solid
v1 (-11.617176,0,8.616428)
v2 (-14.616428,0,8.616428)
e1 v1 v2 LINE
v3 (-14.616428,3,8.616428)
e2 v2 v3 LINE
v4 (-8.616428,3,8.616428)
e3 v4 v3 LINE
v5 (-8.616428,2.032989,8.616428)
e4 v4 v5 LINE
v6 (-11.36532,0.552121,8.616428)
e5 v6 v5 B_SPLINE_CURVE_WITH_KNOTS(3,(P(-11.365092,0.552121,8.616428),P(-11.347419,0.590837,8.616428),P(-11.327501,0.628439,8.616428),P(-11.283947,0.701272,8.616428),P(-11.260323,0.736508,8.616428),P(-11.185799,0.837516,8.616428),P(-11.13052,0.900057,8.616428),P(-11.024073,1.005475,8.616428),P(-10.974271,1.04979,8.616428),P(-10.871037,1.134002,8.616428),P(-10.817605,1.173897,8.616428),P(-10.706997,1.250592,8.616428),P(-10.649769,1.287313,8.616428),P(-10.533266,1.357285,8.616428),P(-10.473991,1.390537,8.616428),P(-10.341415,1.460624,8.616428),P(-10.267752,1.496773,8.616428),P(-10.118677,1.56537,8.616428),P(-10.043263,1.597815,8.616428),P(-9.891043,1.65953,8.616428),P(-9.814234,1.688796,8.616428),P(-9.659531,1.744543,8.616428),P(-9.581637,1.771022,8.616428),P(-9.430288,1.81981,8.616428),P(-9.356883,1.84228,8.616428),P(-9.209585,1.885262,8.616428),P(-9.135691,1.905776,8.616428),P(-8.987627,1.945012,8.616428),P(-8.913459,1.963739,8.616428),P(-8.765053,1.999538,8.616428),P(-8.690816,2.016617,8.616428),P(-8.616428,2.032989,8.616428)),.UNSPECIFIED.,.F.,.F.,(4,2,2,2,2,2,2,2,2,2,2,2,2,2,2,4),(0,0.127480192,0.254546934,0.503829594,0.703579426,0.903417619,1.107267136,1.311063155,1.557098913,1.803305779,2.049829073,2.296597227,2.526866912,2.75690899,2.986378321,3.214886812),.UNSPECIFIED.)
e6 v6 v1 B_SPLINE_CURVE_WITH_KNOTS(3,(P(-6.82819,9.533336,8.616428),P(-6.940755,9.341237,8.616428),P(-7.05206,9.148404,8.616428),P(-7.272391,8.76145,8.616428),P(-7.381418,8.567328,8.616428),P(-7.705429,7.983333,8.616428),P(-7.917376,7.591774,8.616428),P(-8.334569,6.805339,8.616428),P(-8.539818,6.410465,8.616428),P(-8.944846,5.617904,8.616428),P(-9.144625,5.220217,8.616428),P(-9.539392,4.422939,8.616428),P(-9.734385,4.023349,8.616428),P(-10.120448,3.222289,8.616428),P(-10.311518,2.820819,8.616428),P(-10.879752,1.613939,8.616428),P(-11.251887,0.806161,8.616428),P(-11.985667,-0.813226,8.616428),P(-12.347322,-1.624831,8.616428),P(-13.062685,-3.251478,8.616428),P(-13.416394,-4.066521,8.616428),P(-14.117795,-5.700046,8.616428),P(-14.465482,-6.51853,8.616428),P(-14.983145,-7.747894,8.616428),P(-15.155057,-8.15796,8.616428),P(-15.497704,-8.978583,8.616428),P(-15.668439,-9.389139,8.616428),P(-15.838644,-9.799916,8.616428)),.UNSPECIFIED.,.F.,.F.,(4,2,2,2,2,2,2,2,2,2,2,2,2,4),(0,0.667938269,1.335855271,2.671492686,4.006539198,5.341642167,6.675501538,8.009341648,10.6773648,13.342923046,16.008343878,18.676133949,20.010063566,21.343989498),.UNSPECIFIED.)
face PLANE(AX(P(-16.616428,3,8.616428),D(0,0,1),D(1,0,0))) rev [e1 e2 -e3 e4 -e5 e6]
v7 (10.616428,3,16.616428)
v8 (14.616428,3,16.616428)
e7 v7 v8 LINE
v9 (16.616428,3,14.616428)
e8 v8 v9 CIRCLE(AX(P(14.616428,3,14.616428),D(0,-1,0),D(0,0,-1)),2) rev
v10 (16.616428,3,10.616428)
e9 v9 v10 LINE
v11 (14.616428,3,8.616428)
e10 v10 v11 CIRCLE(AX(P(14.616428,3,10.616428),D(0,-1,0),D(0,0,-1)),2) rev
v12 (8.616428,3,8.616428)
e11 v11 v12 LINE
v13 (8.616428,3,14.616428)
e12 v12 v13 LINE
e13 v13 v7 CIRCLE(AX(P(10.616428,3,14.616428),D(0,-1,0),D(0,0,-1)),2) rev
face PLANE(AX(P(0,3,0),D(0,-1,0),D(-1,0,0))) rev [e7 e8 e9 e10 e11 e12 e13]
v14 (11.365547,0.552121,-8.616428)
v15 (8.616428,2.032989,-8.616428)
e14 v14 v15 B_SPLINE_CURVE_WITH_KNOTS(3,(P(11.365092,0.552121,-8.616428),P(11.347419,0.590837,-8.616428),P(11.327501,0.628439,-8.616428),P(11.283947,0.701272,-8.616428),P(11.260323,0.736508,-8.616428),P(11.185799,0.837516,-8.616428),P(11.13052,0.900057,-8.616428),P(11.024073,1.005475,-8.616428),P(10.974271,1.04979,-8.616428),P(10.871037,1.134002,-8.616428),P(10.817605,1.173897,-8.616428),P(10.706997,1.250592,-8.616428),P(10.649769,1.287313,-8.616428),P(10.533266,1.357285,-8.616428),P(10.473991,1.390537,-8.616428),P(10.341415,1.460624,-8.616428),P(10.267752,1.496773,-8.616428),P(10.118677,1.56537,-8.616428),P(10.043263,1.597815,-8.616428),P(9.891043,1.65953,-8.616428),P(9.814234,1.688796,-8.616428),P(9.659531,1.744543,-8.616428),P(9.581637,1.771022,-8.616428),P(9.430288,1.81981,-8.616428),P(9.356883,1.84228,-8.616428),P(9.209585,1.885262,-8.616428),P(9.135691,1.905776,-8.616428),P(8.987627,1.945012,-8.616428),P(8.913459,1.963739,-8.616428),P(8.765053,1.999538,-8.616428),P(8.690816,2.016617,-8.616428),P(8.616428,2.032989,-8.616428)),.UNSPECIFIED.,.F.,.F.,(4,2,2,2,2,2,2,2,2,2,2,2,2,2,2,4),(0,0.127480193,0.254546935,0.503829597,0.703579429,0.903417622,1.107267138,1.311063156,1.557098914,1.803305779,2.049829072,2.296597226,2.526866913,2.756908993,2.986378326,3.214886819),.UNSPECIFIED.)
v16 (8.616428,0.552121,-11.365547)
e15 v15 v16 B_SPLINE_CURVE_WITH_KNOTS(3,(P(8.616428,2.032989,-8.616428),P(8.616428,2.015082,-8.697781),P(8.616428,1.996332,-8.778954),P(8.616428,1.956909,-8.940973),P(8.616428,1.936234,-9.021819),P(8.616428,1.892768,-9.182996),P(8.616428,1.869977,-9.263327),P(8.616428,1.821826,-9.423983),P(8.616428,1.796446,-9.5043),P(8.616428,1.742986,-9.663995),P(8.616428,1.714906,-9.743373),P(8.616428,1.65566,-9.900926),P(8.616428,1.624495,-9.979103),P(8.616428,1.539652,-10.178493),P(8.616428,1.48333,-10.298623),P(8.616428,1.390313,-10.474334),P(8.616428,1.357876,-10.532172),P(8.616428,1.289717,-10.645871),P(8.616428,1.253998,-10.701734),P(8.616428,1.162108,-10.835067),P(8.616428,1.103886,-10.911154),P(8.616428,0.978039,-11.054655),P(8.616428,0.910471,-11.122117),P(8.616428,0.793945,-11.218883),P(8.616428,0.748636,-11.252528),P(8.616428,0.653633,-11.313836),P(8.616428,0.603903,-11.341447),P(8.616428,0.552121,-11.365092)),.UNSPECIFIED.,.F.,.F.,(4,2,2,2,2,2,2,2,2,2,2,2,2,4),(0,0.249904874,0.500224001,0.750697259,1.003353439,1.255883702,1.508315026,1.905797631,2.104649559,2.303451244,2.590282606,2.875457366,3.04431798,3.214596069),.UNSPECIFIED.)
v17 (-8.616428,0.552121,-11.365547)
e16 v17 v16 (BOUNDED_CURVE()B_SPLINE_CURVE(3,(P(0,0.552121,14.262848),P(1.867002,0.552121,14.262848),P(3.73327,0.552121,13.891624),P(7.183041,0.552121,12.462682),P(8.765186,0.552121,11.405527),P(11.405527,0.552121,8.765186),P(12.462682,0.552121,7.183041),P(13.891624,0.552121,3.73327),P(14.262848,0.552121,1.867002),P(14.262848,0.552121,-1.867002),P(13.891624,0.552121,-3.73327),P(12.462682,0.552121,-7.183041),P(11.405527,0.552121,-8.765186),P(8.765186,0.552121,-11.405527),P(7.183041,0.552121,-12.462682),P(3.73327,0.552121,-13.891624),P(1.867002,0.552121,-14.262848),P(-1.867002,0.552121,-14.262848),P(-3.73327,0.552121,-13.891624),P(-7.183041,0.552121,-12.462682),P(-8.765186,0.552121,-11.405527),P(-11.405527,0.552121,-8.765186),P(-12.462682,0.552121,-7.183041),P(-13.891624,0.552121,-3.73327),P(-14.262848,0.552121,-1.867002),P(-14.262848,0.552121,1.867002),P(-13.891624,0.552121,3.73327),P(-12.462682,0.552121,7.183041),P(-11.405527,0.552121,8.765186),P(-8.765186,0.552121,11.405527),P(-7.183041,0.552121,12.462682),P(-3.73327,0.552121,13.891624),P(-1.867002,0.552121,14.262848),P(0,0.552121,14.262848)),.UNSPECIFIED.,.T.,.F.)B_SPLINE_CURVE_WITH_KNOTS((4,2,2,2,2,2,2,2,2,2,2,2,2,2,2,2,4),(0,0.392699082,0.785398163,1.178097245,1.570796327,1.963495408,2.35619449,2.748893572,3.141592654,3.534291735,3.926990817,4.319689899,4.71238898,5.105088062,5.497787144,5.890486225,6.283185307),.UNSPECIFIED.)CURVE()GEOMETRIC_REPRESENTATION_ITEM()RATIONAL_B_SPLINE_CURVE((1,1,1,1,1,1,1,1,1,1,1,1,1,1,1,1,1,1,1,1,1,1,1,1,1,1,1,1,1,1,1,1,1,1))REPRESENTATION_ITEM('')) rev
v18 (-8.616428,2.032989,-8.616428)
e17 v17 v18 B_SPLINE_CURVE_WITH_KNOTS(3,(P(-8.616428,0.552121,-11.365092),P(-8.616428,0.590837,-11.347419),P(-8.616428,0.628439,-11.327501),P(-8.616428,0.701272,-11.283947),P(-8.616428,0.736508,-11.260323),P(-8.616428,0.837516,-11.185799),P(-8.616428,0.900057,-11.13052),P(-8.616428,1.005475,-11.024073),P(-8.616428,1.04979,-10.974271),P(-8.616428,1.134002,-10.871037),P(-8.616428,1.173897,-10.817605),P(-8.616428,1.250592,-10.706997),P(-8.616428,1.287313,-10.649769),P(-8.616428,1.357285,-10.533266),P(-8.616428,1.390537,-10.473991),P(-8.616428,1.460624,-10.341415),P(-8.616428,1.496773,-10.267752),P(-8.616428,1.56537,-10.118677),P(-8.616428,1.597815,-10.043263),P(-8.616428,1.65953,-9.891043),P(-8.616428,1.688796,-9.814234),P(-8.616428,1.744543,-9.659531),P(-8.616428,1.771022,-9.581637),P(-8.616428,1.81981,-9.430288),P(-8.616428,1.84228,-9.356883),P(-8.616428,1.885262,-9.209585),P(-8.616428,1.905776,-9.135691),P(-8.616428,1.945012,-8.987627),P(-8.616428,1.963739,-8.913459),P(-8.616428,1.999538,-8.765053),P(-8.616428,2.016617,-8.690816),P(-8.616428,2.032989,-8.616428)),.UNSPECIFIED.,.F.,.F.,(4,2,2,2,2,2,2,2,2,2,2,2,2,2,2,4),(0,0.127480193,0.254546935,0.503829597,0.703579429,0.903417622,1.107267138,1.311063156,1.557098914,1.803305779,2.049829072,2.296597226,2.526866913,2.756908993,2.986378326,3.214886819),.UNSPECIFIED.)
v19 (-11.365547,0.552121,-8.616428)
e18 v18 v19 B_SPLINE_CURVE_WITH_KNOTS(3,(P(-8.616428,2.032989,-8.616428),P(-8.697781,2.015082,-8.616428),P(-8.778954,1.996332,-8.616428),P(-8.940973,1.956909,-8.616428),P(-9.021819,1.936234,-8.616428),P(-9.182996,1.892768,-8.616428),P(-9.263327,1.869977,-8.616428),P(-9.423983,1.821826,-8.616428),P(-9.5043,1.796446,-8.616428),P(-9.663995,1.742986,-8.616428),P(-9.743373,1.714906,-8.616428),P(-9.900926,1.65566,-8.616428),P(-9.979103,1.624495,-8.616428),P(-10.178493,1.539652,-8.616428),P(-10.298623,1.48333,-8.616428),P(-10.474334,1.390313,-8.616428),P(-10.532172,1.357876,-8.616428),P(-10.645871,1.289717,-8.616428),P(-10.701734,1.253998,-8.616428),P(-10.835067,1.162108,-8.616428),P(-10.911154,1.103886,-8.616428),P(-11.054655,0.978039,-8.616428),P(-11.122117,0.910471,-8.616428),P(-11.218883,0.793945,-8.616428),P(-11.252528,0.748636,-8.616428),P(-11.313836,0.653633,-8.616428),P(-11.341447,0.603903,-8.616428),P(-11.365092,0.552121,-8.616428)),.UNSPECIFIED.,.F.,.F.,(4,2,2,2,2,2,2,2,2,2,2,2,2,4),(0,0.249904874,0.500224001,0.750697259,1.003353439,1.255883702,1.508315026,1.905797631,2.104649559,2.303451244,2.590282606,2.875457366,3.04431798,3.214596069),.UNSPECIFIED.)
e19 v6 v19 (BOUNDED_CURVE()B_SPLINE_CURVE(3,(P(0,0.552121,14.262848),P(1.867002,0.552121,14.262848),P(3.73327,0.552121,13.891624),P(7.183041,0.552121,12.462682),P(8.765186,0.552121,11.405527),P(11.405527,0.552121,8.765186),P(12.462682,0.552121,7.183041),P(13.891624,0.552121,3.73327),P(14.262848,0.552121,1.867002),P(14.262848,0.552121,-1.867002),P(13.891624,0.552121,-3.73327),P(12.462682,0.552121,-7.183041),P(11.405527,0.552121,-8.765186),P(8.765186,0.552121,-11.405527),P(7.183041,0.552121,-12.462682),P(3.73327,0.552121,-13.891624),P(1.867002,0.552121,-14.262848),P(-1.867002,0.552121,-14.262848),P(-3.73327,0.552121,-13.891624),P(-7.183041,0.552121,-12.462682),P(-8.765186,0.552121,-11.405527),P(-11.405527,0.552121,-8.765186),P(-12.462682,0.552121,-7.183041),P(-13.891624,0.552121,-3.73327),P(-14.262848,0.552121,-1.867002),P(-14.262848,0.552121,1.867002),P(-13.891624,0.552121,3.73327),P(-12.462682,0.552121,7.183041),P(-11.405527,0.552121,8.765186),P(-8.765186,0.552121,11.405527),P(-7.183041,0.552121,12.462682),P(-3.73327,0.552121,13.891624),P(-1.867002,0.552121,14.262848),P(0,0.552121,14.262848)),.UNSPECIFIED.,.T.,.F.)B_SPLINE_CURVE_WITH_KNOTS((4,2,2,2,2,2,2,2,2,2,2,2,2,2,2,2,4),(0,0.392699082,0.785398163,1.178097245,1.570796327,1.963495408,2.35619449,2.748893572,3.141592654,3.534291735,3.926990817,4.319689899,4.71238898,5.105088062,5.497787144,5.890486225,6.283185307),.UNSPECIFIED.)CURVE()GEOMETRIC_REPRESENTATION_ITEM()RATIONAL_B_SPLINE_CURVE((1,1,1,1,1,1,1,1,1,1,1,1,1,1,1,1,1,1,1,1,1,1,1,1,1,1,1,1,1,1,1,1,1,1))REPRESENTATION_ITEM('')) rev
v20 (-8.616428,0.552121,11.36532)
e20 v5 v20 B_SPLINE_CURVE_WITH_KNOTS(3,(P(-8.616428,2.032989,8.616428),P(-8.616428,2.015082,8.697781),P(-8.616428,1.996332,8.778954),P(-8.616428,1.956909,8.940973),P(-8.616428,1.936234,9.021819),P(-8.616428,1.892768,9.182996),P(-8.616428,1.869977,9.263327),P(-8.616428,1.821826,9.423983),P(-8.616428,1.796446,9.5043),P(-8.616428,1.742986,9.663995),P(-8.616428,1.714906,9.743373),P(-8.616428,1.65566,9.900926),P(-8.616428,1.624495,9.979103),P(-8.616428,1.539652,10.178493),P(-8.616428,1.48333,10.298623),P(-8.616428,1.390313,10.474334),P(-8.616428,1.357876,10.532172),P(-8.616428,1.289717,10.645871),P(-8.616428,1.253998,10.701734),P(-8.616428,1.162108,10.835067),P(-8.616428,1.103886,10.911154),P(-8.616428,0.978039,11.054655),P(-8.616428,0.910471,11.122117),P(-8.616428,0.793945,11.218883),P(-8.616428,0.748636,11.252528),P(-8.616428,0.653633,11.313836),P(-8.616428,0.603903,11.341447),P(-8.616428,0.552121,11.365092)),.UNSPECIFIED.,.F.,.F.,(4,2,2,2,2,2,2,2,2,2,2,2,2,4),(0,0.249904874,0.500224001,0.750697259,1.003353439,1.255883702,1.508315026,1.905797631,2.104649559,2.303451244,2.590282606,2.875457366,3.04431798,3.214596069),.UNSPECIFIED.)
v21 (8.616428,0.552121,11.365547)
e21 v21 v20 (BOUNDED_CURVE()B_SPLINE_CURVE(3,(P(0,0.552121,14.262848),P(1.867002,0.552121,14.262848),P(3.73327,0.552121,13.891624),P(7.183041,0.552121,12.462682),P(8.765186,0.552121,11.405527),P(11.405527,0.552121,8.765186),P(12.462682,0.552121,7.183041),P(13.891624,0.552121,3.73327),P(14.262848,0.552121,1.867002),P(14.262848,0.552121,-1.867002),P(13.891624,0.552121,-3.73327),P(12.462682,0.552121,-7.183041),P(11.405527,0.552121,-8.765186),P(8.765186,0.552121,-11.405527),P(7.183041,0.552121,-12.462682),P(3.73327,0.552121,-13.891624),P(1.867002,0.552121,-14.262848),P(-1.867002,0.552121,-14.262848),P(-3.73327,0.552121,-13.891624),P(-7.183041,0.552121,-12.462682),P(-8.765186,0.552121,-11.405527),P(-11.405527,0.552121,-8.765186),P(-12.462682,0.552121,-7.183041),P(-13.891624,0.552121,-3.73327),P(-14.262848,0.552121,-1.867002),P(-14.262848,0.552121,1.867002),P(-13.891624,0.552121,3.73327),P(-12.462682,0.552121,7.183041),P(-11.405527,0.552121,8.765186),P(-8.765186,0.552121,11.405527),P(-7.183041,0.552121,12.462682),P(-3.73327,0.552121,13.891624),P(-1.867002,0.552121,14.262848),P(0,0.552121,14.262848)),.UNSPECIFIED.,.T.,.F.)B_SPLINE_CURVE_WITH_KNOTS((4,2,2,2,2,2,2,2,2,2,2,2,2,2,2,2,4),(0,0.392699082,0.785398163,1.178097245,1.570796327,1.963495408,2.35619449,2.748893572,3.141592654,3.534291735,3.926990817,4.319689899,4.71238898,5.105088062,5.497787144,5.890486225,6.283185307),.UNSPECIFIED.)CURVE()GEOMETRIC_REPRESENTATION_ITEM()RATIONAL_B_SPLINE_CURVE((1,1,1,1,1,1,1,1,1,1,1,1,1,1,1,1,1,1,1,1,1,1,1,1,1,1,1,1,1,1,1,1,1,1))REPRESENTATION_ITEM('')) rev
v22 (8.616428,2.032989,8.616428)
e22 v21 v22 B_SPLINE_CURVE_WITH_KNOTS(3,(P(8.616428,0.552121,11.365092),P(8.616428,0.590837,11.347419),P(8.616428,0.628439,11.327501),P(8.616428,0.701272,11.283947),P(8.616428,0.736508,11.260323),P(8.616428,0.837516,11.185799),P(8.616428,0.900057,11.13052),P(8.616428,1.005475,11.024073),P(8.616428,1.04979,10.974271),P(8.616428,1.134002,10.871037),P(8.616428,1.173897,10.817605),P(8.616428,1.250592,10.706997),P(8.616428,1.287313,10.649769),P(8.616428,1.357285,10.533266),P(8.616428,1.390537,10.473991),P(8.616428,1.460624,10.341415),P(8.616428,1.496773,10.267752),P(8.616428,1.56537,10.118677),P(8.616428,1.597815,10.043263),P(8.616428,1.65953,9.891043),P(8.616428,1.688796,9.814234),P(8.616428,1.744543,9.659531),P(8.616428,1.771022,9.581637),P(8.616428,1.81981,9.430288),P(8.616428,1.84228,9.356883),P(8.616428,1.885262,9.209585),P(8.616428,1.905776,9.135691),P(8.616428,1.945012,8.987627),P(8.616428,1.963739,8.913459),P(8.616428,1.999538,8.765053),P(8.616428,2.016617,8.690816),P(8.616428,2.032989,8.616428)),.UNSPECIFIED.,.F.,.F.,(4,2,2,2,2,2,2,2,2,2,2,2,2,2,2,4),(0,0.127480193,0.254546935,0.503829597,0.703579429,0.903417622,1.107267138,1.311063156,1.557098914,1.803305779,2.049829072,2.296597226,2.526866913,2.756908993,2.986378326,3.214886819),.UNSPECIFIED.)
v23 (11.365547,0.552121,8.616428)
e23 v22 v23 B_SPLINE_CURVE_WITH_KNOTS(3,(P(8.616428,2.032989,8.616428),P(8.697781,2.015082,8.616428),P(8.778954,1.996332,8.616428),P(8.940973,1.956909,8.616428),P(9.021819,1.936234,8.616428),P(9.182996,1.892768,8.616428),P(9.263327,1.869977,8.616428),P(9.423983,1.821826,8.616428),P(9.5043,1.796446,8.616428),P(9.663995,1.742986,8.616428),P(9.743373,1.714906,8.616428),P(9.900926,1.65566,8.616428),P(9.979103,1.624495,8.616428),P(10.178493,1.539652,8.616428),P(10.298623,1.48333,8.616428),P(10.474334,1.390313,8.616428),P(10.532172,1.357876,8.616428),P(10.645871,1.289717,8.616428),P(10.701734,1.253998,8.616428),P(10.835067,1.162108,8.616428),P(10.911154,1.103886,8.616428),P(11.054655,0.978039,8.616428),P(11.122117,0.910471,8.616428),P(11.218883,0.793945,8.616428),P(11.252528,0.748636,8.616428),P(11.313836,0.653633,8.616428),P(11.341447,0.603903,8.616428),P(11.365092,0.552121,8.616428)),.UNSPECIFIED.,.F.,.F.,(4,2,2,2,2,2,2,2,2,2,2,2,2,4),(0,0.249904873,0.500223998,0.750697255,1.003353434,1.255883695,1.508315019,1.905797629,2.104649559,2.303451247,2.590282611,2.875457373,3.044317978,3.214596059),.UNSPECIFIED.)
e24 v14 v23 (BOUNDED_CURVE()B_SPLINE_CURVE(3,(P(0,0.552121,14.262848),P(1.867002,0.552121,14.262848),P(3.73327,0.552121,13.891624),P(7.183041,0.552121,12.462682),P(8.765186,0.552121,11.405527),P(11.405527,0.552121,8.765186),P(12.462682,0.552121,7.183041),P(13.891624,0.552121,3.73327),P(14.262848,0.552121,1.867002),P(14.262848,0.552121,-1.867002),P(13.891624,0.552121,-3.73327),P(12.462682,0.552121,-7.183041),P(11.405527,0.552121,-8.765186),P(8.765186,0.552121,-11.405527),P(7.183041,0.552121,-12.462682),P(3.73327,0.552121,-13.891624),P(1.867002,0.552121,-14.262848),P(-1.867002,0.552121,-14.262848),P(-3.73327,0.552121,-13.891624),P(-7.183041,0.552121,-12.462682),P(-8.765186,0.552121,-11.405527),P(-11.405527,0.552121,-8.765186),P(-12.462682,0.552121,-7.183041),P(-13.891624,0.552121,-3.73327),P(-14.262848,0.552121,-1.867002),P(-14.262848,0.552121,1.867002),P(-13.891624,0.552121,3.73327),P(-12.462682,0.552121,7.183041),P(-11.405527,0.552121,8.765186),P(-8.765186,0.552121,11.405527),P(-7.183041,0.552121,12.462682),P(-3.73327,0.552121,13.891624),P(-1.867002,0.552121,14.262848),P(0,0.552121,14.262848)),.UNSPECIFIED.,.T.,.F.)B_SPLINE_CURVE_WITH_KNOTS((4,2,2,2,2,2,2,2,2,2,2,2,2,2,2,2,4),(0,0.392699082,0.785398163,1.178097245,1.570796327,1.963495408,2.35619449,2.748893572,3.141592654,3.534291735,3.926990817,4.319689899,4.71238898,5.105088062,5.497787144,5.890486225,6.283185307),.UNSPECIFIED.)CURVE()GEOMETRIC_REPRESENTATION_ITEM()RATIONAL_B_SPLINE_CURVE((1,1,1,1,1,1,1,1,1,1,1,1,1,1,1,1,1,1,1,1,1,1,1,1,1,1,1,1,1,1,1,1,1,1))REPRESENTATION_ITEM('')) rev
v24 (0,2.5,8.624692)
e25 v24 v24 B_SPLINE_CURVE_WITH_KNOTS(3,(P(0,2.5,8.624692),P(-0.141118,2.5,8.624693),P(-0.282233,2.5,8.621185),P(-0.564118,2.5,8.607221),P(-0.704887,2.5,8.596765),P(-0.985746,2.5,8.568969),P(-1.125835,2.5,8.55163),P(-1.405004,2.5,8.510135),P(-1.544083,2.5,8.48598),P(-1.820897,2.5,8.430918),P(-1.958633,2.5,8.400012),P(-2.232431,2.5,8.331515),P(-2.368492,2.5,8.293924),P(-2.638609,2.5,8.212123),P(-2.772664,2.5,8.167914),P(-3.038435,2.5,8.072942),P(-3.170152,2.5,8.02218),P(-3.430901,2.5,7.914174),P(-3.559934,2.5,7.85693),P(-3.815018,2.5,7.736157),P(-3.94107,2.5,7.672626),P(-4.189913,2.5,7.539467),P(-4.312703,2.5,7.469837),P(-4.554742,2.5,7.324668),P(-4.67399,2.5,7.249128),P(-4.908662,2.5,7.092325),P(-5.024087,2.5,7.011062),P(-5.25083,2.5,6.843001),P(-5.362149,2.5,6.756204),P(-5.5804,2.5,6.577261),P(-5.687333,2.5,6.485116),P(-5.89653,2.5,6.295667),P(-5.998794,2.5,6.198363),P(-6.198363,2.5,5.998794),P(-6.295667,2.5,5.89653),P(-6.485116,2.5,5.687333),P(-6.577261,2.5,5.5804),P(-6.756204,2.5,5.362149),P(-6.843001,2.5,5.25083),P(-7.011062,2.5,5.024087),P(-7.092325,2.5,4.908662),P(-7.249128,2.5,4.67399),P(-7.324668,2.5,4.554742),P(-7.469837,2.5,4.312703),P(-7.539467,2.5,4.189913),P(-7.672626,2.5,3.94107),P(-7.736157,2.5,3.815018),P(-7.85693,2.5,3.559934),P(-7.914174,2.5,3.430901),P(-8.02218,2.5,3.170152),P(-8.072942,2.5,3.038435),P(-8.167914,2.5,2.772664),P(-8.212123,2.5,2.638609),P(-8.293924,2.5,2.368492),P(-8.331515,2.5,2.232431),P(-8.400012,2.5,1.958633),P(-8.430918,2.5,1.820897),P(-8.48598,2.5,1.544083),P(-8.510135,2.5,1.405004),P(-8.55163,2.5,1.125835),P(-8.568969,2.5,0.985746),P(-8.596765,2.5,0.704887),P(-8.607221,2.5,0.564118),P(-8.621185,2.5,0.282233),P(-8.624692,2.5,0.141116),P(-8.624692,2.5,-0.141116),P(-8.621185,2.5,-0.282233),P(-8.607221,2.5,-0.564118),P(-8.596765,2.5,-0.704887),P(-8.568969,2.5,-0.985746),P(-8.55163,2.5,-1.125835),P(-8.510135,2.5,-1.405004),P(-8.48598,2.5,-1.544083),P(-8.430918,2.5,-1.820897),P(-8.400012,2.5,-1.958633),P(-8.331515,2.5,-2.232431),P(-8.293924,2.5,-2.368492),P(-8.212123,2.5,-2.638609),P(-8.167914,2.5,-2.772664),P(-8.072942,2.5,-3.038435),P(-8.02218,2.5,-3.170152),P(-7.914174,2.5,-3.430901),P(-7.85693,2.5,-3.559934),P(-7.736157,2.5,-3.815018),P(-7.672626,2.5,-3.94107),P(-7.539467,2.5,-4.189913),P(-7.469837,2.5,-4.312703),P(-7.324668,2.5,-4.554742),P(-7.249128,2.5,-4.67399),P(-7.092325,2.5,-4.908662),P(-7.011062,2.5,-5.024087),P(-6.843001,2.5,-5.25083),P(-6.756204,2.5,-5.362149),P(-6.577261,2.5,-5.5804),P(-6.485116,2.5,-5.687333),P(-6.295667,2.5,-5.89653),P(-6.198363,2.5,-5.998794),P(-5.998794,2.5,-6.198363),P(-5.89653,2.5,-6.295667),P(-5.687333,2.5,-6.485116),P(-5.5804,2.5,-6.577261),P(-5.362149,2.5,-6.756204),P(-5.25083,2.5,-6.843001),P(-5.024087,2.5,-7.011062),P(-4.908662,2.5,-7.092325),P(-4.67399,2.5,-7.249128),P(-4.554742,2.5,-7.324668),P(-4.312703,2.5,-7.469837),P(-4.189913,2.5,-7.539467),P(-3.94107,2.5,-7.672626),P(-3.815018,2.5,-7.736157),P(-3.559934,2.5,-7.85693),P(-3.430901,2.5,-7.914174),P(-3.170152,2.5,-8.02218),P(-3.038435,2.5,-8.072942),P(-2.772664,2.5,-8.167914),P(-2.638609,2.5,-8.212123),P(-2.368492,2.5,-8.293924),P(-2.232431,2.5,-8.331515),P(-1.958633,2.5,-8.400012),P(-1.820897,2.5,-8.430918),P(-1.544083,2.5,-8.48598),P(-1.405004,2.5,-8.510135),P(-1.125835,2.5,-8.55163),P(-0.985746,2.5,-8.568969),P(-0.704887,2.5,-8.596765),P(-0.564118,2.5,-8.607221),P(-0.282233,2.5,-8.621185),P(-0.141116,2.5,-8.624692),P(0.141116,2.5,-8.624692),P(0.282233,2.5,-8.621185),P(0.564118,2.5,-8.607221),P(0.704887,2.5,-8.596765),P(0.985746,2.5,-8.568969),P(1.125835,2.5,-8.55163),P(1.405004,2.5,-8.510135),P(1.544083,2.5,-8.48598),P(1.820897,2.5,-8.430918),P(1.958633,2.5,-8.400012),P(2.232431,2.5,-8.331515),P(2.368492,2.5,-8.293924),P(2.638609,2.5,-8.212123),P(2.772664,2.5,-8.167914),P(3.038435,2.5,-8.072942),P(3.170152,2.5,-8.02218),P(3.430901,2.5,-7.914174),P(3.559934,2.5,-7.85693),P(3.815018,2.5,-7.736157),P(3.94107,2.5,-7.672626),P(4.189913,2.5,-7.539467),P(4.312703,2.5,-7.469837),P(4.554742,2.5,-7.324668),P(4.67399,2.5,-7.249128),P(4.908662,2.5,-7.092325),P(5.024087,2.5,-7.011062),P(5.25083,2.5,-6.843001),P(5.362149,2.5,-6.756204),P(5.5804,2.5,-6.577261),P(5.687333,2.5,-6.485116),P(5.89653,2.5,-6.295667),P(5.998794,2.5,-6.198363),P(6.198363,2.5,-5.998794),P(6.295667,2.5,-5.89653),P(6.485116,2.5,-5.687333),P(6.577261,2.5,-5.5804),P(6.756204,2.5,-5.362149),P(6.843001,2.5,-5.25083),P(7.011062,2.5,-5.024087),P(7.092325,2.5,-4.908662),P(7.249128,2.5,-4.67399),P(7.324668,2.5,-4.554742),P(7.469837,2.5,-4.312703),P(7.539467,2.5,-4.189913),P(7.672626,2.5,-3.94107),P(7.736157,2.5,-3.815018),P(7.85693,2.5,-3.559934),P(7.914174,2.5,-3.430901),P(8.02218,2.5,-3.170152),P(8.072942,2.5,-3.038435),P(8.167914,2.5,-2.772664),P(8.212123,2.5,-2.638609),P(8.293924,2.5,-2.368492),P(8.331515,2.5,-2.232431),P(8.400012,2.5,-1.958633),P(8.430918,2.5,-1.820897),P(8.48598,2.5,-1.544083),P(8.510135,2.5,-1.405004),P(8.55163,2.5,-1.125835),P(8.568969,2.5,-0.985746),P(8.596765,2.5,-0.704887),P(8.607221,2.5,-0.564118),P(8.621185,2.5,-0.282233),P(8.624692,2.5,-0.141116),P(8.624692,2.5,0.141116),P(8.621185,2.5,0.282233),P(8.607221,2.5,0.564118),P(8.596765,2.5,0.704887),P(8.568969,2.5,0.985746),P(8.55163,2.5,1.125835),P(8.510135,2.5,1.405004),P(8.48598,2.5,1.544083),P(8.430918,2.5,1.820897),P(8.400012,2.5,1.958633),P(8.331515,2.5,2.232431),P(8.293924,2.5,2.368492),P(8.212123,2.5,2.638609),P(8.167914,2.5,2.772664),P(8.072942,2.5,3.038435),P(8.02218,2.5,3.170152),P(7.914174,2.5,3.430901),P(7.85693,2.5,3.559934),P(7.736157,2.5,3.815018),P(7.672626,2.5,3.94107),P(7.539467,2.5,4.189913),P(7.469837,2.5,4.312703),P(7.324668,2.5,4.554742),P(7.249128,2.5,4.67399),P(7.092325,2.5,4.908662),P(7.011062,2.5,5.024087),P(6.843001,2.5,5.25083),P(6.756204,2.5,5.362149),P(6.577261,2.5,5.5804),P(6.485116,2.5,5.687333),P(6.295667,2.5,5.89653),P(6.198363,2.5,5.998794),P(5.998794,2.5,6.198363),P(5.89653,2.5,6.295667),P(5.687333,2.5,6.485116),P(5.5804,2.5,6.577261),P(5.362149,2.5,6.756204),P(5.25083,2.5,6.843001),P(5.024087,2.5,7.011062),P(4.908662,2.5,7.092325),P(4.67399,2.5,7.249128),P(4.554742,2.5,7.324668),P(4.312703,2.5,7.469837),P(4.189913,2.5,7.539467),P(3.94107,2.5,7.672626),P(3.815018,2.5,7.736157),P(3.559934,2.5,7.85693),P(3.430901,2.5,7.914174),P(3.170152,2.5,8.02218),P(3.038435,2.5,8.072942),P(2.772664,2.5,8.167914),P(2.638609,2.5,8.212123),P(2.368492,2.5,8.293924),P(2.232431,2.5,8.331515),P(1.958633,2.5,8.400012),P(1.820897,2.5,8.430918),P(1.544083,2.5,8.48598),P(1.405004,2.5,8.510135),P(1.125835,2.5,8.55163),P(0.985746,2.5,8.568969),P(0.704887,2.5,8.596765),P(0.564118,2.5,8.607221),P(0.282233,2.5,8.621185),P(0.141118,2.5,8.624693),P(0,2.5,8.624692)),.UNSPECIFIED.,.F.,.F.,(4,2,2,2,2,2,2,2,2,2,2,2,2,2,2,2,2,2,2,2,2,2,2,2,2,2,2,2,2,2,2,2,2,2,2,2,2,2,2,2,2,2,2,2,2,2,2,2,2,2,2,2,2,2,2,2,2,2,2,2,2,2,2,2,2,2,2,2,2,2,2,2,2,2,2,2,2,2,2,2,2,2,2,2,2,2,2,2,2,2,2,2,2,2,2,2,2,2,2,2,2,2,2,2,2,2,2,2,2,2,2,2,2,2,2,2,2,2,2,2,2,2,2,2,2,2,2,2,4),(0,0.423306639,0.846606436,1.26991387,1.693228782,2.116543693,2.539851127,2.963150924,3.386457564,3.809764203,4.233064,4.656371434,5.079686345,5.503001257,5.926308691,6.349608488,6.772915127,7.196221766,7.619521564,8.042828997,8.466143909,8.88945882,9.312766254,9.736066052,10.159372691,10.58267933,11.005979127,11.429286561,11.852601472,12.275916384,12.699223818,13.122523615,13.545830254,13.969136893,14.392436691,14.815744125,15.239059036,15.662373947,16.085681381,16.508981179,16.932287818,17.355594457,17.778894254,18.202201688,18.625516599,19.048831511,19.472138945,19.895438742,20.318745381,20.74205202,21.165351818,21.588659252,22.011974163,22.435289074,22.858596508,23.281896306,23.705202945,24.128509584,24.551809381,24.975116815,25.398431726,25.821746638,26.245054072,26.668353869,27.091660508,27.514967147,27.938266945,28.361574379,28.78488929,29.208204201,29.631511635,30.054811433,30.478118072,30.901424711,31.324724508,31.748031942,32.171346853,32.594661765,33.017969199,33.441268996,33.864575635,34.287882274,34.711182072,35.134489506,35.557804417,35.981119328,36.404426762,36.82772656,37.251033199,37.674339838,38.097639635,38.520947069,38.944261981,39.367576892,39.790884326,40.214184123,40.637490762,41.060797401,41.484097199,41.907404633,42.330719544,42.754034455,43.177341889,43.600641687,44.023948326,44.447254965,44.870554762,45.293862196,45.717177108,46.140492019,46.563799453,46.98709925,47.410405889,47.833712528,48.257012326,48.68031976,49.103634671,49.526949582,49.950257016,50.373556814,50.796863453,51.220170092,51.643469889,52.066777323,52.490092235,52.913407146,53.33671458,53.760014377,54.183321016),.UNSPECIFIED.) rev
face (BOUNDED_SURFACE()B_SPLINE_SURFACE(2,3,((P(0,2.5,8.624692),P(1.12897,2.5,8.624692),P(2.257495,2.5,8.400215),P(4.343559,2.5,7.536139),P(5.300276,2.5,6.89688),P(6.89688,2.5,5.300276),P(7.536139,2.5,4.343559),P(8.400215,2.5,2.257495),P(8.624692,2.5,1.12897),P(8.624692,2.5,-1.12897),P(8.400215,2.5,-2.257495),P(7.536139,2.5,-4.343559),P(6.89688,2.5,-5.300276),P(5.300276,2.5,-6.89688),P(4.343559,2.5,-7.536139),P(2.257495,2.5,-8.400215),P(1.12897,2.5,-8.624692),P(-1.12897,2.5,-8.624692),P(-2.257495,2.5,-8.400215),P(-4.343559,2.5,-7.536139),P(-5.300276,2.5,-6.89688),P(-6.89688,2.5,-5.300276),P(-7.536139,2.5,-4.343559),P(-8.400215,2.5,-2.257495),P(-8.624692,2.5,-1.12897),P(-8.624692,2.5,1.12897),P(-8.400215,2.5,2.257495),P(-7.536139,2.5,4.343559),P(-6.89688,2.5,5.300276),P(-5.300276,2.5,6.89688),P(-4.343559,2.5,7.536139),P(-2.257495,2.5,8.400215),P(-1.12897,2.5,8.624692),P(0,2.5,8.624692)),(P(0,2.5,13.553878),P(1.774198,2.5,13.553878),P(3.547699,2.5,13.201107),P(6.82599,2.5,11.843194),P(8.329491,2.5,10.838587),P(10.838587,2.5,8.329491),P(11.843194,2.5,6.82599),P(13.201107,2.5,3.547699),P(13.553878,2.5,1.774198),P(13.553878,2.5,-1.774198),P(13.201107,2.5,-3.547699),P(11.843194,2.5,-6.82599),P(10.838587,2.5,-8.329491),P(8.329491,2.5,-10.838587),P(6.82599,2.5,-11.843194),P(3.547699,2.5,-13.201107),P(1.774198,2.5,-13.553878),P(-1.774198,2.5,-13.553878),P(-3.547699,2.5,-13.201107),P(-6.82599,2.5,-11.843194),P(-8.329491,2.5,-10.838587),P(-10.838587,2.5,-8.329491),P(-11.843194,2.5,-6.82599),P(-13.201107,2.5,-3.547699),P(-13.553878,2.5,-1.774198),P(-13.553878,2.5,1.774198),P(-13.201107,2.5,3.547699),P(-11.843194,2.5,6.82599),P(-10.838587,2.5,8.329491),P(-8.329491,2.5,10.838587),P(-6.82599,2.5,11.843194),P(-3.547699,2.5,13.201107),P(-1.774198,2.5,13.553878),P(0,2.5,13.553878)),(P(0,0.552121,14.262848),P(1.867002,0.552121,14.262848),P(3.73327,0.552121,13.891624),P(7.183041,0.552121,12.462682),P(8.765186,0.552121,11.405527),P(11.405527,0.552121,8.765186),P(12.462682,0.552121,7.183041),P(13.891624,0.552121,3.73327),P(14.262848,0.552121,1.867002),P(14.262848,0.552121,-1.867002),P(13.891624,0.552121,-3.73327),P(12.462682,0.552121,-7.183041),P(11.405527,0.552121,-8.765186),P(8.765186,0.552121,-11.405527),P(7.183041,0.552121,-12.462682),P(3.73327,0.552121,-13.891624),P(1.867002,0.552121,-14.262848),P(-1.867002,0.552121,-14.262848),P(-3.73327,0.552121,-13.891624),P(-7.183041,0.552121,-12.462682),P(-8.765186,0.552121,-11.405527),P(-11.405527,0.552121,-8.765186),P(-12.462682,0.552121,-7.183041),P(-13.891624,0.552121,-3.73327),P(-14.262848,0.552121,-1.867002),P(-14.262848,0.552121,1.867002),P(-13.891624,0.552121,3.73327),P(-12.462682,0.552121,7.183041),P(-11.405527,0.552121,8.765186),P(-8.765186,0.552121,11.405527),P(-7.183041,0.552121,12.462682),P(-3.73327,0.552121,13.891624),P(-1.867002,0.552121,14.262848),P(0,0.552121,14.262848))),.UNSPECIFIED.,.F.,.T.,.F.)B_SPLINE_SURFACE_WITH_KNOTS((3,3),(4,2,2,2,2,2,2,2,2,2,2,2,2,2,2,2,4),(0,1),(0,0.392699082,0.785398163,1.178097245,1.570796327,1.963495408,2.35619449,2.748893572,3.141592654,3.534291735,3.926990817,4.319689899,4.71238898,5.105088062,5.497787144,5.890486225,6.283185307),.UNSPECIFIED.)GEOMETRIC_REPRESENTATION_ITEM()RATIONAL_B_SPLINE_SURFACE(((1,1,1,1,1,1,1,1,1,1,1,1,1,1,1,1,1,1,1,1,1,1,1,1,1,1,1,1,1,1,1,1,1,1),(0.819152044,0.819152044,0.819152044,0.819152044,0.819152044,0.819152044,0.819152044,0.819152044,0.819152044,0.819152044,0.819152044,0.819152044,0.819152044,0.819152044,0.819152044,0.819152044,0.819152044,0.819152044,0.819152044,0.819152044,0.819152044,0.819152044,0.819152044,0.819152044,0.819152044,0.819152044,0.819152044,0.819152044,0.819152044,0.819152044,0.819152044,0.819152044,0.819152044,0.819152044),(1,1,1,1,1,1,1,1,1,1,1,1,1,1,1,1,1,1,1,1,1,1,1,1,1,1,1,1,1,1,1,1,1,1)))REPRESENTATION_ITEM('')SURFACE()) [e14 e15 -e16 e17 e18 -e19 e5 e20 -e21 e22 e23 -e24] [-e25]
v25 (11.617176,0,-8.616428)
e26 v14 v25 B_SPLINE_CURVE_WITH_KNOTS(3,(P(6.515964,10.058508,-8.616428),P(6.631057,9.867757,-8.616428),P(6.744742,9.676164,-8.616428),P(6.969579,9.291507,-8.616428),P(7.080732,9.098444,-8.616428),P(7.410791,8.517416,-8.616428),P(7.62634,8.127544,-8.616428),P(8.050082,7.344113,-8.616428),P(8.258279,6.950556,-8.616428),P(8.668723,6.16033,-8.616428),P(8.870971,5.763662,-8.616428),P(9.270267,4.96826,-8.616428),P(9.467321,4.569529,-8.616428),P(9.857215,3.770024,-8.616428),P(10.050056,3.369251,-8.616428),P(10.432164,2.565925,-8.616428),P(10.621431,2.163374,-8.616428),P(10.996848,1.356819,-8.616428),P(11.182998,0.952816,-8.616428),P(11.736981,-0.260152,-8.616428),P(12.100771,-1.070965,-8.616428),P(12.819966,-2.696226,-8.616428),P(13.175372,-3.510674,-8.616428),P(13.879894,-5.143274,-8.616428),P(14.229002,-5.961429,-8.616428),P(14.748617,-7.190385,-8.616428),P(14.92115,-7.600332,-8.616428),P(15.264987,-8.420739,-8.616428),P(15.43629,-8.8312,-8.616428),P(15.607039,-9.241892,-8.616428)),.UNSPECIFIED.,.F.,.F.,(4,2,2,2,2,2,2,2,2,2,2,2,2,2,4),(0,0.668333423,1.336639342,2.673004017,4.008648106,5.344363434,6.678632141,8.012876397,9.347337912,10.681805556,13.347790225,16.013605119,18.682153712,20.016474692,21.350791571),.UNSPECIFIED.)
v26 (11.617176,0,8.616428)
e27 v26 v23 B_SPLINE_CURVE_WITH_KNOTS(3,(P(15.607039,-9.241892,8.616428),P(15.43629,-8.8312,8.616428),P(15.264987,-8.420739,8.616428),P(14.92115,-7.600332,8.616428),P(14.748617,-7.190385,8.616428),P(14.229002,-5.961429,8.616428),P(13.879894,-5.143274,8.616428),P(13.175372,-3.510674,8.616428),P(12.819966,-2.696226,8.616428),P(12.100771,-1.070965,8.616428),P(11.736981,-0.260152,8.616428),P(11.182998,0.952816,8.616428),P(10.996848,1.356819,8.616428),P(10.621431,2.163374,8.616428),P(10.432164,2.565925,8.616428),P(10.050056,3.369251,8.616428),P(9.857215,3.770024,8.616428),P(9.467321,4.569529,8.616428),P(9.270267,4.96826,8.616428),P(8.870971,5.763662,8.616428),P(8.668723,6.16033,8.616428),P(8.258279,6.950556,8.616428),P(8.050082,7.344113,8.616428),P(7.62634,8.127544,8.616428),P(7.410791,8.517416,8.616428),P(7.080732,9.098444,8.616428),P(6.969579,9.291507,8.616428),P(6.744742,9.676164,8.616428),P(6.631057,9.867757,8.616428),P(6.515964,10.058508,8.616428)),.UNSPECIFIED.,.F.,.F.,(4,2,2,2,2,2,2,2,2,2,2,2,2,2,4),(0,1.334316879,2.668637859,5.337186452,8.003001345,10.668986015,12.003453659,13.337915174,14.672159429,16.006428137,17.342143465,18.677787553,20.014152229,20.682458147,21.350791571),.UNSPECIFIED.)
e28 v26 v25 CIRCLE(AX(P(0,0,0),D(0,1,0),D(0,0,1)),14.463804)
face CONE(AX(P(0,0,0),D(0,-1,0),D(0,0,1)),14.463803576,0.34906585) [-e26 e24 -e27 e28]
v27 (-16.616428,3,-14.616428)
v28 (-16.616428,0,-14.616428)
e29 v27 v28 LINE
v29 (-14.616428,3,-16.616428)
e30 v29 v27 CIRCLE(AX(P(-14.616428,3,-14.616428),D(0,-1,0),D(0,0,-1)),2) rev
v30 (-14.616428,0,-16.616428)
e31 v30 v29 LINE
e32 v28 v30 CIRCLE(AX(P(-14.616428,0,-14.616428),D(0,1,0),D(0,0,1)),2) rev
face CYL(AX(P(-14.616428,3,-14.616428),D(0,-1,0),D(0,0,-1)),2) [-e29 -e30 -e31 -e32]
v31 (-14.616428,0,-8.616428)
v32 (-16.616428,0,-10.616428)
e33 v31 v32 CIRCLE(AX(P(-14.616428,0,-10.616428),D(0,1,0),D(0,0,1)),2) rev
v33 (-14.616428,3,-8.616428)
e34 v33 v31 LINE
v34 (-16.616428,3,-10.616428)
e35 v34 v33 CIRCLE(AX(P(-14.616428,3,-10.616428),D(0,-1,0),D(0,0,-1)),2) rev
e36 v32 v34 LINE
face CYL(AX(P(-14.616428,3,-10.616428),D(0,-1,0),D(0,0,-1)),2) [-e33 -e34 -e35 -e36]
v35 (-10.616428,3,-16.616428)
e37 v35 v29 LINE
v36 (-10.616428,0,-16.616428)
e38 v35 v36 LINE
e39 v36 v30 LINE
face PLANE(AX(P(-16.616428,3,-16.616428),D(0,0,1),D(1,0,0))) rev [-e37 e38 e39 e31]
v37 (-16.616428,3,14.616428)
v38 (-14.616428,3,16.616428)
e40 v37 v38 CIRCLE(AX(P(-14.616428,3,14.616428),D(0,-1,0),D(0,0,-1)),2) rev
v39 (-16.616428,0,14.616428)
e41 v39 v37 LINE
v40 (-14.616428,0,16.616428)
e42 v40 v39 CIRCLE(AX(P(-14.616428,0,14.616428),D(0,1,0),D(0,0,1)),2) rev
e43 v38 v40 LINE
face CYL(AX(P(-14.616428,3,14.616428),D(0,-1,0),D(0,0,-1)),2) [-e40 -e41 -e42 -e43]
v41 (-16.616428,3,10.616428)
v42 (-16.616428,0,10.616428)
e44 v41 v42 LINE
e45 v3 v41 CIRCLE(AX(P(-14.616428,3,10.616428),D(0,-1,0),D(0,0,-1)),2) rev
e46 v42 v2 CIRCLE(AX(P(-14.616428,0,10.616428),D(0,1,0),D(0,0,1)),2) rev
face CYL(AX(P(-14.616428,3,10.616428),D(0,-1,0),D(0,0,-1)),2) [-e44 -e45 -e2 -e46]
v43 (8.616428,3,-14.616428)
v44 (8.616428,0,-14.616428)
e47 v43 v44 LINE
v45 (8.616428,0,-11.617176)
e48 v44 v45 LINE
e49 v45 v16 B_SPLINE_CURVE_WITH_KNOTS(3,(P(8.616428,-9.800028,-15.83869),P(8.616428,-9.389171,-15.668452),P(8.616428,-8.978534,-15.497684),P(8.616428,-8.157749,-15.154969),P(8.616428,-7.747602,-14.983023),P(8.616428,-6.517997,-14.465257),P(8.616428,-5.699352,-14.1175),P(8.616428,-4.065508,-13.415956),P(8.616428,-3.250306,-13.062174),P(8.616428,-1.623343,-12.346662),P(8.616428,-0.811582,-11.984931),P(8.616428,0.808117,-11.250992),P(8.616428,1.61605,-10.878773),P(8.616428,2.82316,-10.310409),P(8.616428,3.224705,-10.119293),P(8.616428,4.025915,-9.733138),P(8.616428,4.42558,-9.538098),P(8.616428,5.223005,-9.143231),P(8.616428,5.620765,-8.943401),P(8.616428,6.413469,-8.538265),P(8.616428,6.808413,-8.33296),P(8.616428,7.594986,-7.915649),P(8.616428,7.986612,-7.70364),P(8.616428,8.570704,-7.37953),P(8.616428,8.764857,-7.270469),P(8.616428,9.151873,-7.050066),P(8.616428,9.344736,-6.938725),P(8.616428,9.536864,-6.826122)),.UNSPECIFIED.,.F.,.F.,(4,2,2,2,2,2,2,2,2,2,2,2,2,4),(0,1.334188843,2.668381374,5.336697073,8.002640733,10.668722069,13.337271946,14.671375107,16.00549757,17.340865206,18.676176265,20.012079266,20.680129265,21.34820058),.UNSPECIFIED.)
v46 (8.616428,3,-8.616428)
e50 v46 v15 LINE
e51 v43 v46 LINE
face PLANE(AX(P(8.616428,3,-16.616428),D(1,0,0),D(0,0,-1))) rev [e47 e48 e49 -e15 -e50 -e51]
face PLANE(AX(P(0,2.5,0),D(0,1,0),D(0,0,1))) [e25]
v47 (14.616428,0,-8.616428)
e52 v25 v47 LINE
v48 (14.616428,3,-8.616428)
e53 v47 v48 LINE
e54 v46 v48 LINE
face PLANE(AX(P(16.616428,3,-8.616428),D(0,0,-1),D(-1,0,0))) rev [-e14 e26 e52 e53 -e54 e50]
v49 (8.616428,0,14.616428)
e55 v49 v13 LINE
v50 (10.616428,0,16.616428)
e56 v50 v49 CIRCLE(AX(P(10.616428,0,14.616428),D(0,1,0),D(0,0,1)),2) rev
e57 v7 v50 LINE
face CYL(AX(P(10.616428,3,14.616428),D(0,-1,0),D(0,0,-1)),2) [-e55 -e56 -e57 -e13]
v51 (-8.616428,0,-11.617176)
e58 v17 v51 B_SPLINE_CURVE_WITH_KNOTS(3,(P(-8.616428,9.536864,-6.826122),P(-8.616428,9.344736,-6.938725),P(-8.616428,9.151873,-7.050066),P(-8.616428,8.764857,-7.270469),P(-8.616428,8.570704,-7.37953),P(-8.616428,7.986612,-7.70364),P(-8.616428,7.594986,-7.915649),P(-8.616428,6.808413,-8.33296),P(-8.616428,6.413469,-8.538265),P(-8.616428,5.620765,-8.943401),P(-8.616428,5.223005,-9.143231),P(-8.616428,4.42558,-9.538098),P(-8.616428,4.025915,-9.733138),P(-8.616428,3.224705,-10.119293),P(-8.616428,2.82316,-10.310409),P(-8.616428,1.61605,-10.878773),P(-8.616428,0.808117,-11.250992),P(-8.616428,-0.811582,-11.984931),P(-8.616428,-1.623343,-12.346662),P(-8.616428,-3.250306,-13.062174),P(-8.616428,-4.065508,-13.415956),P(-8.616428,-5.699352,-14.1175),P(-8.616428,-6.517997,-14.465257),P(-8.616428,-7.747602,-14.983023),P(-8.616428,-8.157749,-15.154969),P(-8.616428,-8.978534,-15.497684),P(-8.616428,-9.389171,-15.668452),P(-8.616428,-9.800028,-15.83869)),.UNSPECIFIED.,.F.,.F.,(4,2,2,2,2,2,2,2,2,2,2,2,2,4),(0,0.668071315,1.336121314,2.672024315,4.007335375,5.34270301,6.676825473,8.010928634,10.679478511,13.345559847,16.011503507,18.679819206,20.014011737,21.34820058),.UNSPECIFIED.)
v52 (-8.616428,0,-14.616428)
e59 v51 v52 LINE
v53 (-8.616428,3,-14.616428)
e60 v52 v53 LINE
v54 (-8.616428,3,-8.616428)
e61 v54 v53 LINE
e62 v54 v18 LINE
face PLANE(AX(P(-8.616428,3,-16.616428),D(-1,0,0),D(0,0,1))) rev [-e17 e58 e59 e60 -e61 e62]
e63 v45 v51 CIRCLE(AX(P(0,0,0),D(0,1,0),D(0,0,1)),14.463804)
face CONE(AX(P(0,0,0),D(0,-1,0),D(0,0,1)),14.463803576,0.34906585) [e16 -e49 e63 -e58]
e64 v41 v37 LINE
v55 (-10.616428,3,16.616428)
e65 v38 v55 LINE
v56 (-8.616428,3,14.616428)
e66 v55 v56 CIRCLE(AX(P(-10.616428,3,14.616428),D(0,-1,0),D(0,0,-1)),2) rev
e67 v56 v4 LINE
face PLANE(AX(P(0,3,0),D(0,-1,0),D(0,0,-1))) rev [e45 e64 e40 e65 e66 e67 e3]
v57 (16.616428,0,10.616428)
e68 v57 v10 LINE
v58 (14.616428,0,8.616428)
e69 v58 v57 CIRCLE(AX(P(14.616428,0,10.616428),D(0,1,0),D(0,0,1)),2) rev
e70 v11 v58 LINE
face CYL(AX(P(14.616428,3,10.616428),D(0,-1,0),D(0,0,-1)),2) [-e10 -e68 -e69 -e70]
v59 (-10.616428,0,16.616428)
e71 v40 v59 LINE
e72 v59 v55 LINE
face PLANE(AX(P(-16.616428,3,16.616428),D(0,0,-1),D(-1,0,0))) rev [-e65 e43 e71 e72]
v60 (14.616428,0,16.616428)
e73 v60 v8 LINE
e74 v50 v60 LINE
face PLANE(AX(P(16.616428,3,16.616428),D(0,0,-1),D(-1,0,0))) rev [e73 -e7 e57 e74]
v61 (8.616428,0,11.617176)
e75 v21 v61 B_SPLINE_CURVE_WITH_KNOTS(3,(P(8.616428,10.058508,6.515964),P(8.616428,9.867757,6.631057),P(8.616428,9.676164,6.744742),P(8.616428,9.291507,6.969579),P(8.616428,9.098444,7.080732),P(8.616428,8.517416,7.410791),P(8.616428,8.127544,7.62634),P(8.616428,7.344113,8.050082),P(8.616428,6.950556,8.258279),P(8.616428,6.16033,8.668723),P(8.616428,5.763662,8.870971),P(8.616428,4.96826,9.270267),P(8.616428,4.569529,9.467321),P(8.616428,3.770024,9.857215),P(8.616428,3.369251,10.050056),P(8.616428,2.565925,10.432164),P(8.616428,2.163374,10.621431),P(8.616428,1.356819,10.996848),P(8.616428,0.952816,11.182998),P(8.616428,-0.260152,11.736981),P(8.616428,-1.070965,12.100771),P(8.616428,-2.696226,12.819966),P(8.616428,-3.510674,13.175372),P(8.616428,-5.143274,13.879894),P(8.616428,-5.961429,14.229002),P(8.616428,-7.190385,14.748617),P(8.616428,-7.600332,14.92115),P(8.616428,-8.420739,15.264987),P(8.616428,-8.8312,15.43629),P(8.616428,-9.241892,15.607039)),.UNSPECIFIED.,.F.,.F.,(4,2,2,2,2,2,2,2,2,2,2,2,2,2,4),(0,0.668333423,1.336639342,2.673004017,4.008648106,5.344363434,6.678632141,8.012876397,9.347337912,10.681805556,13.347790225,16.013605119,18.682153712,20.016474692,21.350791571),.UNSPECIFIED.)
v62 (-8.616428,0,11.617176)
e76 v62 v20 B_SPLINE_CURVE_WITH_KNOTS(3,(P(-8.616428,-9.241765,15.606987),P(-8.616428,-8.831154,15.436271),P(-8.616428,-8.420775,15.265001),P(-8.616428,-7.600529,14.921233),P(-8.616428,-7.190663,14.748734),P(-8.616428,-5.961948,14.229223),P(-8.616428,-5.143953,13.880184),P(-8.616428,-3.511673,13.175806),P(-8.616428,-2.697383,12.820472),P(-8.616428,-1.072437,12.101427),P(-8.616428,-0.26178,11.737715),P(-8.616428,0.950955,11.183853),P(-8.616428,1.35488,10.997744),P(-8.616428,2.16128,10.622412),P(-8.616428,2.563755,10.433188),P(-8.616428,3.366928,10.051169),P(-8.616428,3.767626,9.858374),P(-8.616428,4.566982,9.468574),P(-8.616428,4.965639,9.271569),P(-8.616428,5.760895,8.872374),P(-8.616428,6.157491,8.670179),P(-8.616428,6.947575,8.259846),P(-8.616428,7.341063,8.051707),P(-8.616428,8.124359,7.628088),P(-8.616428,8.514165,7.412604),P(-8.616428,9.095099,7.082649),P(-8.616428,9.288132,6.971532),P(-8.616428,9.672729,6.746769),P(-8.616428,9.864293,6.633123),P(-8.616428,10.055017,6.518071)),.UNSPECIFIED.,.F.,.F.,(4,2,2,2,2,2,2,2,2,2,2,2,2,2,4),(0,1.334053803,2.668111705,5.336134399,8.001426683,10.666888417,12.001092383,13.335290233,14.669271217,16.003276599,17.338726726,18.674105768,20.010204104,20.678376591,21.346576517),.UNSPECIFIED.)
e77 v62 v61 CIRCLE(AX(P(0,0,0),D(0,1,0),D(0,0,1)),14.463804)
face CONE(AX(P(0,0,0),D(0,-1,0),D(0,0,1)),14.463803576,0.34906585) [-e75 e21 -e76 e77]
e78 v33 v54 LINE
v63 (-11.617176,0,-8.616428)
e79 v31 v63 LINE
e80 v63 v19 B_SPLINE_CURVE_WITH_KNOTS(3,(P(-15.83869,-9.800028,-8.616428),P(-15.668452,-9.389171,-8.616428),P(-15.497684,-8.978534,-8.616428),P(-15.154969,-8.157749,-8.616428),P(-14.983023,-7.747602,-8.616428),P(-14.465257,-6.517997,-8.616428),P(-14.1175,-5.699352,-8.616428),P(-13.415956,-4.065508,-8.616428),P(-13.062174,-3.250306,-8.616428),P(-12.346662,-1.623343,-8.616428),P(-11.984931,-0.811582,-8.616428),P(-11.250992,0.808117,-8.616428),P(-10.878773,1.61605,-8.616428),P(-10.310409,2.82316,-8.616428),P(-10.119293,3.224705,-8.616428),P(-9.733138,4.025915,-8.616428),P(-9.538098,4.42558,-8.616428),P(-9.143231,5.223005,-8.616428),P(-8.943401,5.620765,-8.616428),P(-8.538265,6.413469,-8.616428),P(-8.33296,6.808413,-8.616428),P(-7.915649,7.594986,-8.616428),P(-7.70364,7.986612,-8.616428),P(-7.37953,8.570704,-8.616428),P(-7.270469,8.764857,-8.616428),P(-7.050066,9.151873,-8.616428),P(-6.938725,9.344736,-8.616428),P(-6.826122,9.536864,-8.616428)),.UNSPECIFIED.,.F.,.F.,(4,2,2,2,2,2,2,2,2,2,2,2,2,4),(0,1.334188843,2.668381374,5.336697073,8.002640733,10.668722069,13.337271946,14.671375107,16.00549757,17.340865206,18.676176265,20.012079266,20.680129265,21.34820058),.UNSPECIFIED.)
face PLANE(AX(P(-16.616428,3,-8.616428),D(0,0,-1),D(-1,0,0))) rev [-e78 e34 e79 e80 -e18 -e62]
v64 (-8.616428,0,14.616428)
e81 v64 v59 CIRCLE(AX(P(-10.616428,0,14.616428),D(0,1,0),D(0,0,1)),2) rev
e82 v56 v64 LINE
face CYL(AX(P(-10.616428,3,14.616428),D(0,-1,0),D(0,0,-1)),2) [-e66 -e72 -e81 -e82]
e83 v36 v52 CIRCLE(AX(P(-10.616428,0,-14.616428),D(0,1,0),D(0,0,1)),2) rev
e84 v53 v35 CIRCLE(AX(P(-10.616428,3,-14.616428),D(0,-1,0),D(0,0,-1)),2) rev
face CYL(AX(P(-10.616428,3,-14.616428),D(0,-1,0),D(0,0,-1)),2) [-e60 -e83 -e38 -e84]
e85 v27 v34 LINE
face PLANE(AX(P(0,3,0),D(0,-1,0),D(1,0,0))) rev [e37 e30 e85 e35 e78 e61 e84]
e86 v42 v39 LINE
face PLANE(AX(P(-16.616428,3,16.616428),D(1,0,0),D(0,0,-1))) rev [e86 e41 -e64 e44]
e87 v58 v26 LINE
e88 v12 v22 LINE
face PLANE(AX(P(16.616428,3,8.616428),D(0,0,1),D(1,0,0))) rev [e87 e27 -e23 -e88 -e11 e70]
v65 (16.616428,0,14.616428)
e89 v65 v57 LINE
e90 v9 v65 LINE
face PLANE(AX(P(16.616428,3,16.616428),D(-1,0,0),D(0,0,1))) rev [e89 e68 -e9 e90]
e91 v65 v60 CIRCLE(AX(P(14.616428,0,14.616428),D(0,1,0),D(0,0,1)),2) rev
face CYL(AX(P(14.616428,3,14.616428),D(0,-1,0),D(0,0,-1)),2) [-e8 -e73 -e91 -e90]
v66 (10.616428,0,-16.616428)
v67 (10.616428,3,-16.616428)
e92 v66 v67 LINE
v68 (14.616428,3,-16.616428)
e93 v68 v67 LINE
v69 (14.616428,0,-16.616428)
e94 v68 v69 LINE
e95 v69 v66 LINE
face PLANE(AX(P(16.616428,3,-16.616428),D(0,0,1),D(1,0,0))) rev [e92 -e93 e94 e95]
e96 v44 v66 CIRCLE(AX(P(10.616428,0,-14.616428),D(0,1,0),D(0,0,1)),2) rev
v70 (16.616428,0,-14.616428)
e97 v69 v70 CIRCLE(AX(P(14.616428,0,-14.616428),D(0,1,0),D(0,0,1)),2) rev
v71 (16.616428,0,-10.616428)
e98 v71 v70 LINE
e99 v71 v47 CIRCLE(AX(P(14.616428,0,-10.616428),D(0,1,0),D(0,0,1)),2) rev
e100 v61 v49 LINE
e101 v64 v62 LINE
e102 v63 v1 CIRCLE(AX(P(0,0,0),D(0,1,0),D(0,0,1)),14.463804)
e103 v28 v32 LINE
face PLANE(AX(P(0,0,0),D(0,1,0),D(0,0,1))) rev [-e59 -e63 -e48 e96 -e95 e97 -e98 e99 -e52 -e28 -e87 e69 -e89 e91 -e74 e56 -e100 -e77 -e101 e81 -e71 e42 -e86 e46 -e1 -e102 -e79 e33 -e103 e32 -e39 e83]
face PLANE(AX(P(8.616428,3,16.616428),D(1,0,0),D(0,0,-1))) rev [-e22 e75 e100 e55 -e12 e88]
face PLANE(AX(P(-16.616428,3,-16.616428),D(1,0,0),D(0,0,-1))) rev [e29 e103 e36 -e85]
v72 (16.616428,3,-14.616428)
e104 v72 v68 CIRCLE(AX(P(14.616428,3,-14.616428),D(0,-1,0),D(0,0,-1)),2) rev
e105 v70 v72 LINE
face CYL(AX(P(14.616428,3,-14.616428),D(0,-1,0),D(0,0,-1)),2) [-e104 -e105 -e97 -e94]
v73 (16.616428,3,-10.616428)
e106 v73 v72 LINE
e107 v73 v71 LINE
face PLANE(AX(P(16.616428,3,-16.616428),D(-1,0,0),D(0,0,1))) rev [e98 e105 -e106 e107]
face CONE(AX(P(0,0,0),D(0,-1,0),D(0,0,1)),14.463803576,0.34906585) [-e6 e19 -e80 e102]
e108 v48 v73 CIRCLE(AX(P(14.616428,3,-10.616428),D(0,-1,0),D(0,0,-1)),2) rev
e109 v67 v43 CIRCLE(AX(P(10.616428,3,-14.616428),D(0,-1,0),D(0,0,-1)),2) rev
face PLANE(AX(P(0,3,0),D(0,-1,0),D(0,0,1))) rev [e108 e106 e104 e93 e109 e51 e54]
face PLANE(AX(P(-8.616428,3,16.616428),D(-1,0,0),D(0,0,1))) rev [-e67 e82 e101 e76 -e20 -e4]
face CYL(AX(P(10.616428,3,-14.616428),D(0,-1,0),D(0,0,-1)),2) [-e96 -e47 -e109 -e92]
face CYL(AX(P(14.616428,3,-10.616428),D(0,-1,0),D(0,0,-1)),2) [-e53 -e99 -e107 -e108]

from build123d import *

# Parameters (mm, degrees)
SKETCH2_R                = 14.463803576
BOSS_EXTRUDE1_DEPTH      = 2.5
BOSS_EXTRUDE1_TAPER      = 20
SKETCH4_W                = 8
SKETCH4_H                = 8
BOSS_EXTRUDE2_DEPTH      = 3
FILLET2_R                = 2
CIRPATTERN1_COUNT        = 4
FILLET2_OF_CIRPATTERN1_R = 2


with BuildPart() as part:
    # Sketch2 → Boss-Extrude1 (new body)
    with BuildSketch(Plane(origin=(0, 0, 0), x_dir=(1, 0, 0), z_dir=(0, 1, 0))):
        Circle(SKETCH2_R)
    extrude(amount=BOSS_EXTRUDE1_DEPTH, taper=BOSS_EXTRUDE1_TAPER)

    # Fillet1
    # an asymmetric fillet: 6, 4 mm, written as the material it takes off along each edge
    with BuildSketch(Plane(origin=(0, 2.5, 0), x_dir=(1, 0, 0), z_dir=(0, 0, -1))) as fillet1_piece_1:
        with BuildLine():
            Bezier((14.262848017, 1.94787914), (13.55387799, 0), (8.624692292, 0), weights=[1, 0.819152044, 1])
            Line((8.624692292, 0), (13.55387799, 0))
            Line((13.55387799, 0), (14.262848017, 1.94787914))
        make_face()
    revolve(axis=Axis((0, 2.5, 0), (0, -1, 0)), mode=Mode.SUBTRACT)

    # Sketch4 → Boss-Extrude2 (add)
    with BuildSketch(Plane(origin=(0, 0, 0), x_dir=(1, 0, 0), z_dir=(0, 1, 0))):
        with Locations((-12.616427752, -12.616427752)):
            Rectangle(SKETCH4_W, SKETCH4_H)
    boss_extrude2 = extrude(amount=BOSS_EXTRUDE2_DEPTH)

    # Fillet2
    fillet2_edges = [part.edges().sort_by_distance(p)[0] for p in [
        (-8.616427752, 1.5, 16.616427752),
        (-16.616427752, 1.5, 8.616427752),
        (-16.616427752, 1.5, 16.616427752),
    ]]
    fillet(fillet2_edges, radius=FILLET2_R)

    # CirPattern1: Boss-Extrude2 ×4 about axis
    cirpattern1_axis = Axis((0, 0, 0), (0, 1, 0))
    for i in range(1, CIRPATTERN1_COUNT):
        add(boss_extrude2.rotate(cirpattern1_axis, i * 360 / CIRPATTERN1_COUNT))

    # Fillet2 of CirPattern1
    fillet2_of_cirpattern1_edges = [part.edges().sort_by_distance(p)[0] for p in [
        (16.616427752, 1.5, 8.616427752),
        (8.616427752, 1.5, 16.616427752),
        (16.616427752, 1.5, 16.616427752),
        (8.616427752, 1.5, -16.616427752),
        (16.616427752, 1.5, -8.616427752),
        (16.616427752, 1.5, -16.616427752),
        (-16.616427752, 1.5, -8.616427752),
        (-8.616427752, 1.5, -16.616427752),
        (-16.616427752, 1.5, -16.616427752),
    ]]
    fillet(fillet2_of_cirpattern1_edges, radius=FILLET2_OF_CIRPATTERN1_R)


solid = part.part
